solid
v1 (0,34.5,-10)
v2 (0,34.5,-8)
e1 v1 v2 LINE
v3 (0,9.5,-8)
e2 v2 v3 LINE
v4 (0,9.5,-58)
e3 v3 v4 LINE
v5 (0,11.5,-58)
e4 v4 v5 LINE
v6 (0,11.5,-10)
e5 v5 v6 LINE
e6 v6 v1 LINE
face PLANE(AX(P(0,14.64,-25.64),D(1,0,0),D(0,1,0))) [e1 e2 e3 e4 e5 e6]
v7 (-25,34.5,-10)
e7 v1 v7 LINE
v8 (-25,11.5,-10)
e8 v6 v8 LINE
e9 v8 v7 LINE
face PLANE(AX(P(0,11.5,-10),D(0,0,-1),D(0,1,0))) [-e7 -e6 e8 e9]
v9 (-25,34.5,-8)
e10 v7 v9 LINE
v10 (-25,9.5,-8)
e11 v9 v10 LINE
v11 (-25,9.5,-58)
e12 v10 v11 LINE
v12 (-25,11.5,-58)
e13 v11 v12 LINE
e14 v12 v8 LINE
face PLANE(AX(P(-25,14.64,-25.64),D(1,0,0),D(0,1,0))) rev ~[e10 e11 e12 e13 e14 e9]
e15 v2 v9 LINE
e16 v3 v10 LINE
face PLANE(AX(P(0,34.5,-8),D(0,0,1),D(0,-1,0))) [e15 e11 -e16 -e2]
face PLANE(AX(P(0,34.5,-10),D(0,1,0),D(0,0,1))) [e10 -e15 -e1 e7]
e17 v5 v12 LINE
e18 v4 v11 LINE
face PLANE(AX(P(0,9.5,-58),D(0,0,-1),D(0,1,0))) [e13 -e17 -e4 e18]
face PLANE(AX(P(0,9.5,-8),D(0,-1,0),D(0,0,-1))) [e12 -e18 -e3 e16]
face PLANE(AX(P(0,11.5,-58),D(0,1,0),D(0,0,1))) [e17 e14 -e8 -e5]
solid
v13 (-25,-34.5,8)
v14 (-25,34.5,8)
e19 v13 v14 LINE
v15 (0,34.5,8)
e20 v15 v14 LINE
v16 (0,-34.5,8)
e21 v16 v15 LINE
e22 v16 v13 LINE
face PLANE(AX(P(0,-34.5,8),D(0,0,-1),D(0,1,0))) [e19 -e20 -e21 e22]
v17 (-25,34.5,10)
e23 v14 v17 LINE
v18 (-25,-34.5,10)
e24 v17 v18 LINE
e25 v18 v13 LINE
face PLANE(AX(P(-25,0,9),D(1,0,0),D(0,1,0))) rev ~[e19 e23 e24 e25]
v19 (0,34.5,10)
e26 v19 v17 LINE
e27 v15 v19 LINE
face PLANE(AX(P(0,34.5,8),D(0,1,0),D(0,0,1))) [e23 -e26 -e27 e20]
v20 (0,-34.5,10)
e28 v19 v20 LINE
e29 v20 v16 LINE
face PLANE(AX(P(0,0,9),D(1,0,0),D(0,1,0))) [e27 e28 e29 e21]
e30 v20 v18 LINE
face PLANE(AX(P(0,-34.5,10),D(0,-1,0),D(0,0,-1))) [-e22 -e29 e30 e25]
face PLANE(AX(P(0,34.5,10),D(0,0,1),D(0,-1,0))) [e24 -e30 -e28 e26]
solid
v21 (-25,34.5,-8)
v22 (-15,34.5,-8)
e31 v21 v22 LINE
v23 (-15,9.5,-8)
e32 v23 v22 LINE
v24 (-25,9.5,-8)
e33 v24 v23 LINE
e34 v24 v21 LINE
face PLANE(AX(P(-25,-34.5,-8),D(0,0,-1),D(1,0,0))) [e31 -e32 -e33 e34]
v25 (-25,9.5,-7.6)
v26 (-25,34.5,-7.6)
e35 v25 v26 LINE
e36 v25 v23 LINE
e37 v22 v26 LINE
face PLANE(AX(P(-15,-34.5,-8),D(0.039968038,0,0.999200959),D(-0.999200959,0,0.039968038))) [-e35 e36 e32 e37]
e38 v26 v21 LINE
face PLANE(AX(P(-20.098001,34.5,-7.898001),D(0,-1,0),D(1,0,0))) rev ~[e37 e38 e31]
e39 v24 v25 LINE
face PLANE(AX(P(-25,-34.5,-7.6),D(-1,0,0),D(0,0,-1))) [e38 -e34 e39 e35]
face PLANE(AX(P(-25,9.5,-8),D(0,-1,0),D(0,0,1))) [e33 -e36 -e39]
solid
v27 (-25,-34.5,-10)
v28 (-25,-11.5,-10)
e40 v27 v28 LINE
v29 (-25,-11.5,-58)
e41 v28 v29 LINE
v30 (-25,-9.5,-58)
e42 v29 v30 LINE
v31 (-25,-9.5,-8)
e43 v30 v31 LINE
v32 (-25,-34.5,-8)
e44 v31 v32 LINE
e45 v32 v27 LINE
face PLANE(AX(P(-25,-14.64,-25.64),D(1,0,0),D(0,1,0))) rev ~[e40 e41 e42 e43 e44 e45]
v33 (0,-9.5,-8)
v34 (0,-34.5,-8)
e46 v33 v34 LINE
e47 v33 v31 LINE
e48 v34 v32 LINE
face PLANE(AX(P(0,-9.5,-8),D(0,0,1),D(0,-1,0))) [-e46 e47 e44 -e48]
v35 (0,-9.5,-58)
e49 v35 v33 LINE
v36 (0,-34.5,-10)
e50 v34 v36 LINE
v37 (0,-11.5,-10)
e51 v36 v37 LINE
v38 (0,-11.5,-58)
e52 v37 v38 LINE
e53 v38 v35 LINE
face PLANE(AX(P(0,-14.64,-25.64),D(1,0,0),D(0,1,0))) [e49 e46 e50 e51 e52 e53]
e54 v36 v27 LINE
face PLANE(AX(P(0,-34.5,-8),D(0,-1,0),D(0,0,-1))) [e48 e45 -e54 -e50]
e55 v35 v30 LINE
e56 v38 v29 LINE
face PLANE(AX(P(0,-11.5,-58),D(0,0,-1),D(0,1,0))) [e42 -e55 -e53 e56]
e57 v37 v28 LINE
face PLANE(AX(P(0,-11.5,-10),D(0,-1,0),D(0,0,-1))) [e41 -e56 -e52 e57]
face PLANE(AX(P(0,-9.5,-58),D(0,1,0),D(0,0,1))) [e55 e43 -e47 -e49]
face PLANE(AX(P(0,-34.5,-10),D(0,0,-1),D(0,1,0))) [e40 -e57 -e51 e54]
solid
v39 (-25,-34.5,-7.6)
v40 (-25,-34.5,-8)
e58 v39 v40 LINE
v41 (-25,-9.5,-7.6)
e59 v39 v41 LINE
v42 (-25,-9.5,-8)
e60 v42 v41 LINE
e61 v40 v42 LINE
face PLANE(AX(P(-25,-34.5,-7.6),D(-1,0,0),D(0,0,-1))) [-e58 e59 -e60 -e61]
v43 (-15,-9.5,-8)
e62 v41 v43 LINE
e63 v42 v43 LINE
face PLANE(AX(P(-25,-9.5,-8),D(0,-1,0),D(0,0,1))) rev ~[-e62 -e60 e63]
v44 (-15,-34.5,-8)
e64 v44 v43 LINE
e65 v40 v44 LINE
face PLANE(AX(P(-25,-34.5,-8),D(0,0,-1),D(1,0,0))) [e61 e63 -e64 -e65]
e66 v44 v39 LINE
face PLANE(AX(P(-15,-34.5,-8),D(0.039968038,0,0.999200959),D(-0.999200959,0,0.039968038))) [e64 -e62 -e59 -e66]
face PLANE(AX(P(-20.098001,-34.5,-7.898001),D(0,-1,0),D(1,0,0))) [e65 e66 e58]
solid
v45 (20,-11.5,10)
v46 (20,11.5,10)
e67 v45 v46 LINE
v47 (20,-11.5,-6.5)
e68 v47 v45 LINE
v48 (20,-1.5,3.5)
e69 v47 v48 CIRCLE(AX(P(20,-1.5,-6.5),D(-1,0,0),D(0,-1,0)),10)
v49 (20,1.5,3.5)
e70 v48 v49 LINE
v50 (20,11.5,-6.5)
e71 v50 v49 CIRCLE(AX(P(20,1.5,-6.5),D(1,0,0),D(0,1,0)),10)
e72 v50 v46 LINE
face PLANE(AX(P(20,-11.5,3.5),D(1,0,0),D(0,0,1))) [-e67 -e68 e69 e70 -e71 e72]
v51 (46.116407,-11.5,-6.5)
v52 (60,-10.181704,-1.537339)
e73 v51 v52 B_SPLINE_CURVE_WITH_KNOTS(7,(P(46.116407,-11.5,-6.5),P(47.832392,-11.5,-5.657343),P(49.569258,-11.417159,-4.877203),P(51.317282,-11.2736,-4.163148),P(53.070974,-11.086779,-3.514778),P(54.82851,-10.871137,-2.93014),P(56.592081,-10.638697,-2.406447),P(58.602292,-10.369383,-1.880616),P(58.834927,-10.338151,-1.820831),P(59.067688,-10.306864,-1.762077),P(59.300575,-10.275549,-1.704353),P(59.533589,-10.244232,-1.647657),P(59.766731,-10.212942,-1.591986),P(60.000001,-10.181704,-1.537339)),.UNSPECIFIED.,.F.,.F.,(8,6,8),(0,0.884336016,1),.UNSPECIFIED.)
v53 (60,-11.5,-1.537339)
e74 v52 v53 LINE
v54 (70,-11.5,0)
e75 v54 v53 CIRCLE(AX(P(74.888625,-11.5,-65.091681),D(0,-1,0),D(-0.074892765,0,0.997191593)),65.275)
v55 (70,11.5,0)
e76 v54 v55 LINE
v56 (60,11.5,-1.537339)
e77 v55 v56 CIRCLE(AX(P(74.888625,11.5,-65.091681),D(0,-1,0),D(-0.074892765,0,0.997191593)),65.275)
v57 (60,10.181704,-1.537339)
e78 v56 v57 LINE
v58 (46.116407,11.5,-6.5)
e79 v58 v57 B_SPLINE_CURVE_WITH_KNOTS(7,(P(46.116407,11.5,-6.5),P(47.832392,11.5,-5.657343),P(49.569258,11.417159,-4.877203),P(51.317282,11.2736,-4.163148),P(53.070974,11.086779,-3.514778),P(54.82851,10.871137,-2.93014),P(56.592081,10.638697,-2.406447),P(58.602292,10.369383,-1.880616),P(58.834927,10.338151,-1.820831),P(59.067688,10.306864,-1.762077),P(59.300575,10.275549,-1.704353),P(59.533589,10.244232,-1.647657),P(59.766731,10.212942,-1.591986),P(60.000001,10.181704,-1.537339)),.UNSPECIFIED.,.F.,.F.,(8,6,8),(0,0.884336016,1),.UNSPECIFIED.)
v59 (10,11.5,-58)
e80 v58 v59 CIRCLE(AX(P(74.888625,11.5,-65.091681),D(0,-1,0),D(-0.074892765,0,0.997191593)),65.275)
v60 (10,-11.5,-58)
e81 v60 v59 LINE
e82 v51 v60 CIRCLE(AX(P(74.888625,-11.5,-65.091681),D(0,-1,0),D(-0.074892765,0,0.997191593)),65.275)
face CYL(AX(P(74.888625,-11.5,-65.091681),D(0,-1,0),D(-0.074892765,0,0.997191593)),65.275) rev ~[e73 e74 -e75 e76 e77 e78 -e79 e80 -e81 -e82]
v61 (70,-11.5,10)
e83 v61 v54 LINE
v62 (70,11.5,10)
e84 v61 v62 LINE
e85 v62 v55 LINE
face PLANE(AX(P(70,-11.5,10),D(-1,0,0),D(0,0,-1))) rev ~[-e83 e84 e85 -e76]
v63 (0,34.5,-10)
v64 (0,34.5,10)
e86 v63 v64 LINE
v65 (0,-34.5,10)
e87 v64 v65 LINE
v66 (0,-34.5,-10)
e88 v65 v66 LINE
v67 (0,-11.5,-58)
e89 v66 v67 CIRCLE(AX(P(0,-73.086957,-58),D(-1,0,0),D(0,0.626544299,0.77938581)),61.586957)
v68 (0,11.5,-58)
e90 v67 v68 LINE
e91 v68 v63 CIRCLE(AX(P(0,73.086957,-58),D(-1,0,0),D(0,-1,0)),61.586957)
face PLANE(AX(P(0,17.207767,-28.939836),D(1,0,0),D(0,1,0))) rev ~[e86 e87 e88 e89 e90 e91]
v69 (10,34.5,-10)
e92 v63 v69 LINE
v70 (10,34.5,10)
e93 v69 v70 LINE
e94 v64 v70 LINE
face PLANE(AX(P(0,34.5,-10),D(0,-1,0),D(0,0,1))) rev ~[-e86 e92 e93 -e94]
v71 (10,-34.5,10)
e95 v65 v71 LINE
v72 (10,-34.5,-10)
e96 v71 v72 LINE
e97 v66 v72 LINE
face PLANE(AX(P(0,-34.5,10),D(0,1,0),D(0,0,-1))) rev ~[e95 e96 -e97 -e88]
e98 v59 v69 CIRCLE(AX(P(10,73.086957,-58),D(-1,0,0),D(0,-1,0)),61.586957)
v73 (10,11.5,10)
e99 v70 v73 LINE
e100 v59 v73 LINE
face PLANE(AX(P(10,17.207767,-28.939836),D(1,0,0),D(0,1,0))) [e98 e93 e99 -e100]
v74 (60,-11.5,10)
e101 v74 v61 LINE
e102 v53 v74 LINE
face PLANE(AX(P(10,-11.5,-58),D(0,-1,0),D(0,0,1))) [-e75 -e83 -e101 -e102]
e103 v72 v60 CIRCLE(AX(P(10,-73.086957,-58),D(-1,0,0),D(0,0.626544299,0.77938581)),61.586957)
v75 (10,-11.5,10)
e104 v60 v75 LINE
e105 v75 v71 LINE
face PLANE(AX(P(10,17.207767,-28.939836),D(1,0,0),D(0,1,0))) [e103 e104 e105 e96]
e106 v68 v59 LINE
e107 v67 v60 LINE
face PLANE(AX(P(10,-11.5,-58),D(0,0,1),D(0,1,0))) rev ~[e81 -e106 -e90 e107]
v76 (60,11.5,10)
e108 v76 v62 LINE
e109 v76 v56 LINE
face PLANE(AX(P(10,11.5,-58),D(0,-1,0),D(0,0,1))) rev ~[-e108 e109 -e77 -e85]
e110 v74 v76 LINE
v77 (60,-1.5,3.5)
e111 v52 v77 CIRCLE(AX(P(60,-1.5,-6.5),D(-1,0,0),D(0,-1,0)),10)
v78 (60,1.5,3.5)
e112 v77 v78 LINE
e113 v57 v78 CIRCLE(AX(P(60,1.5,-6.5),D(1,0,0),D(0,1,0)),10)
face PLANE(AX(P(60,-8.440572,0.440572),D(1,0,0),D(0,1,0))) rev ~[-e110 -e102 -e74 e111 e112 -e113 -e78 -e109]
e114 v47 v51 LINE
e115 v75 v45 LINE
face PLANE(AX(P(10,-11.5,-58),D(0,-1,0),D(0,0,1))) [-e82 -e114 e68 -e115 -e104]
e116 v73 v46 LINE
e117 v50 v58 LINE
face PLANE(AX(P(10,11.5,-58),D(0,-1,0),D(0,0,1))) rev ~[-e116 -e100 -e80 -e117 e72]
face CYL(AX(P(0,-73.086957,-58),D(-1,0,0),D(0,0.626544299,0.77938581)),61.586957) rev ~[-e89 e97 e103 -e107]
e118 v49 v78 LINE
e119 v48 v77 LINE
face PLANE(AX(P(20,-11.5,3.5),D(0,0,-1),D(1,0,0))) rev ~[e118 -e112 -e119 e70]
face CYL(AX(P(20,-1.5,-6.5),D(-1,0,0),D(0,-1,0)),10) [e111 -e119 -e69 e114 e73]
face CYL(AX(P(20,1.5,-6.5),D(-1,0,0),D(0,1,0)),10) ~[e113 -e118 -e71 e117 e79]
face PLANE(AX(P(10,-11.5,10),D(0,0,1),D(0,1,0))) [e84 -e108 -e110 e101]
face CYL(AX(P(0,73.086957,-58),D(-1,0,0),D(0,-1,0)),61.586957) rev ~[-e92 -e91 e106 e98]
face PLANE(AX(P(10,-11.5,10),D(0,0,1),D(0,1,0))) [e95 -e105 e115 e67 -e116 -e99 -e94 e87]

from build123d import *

# Parameters (mm, degrees)
F1_DEPTH     = 25
F2_DEPTH     = 10
F5_DEPTH     = 69
F6_W         = 19
F6_H         = 1.5
F7_DEPTH     = 10
F8_W         = 23
F8_H         = 68
F9_DEPTH     = 100
F10_W        = 40
F10_H        = 6.5
F11_DEPTH    = 46.001
F12_DEPTH    = 23.001
F13_T1_DEPTH = 40


# Not quite as in the source:
# - a fillet or chamfer that OpenCascade refuses, or shapes differently, is made with other operations: its cross-section is extruded or revolved along the edge and cut away or added
# - a feature names something its author has since deleted; it is built from what else it names


with BuildPart() as f1:
    # F0 (on Right) → F1 (new body)
    with BuildSketch(Plane.YZ):
        Polygon((-9.5, -8), (-34.5, -8), (-34.5, -10), (-11.5, -10), (-11.5, -58), (-9.5, -58), align=None)
    extrude(amount=-F1_DEPTH)

    # F10 (on face) → F12 (cut, through all)
    with BuildSketch(Plane.XZ.offset(11.5)):
        with Locations((40, 6.75)):
            Rectangle(F10_W, F10_H)
        with BuildLine():
            Line((110, 10), (70, 10))
            Line((70, 10), (70, 0))
            ThreePointArc((70, 0), (29.5210578409, -18.1597150078), (10, -58))
            Line((10, -58), (110, -58))
            Line((110, -58), (110, 10))
        make_face()
    extrude(amount=F12_DEPTH, mode=Mode.SUBTRACT)


with BuildPart() as f1b:
    # F0 (on Right) → F1, piece 2 (new body)
    with BuildSketch(Plane.YZ):
        Polygon((34.5, -10), (34.5, -8), (9.5, -8), (9.5, -58), (11.5, -58), (11.5, -10), align=None)
    extrude(amount=-F1_DEPTH)


with BuildPart() as f1c:
    # F0 (on Right) → F1, piece 3 (new body)
    with BuildSketch(Plane.YZ):
        Polygon((-9.5, 8), (9.5, 8), (34.5, 8), (34.5, 10), (9.5, 10), (-9.5, 10), (-34.5, 10), (-34.5, 8), align=None)
    extrude(amount=-F1_DEPTH)


with BuildPart() as f2:
    # F0 (on Right) → F2 (new body)
    with BuildSketch(Plane.YZ):
        with BuildLine():
            ThreePointArc((11.5, -58), (17.5468519701, -31.3870332357), (34.5, -10))
            Line((34.5, -10), (11.5, -10))
            Line((11.5, -10), (11.5, -58))
        make_face()
        Polygon((34.5, 8), (9.5, 8), (-9.5, 8), (-34.5, 8), (-34.5, -8), (-9.5, -8), (-9.5, -58), (9.5, -58), (9.5, -8), (34.5, -8), align=None)
        with BuildLine():
            Line((-11.5, -10), (-34.5, -10))
            ThreePointArc((-34.5, -10), (-17.5468519701, -31.3870332357), (-11.5, -58))
            Line((-11.5, -58), (-11.5, -10))
        make_face()
        Polygon((-9.5, -8), (-34.5, -8), (-34.5, -10), (-11.5, -10), (-11.5, -58), (-9.5, -58), align=None)
        Polygon((34.5, -10), (34.5, -8), (9.5, -8), (9.5, -58), (11.5, -58), (11.5, -10), align=None)
        Polygon((-9.5, 8), (9.5, 8), (34.5, 8), (34.5, 10), (9.5, 10), (-9.5, 10), (-34.5, 10), (-34.5, 8), align=None)
    extrude(amount=F2_DEPTH)

    # F8 (on face) → F9 (join)
    with BuildSketch(Plane.YZ.offset(10)):
        with Locations((0, -24)):
            Rectangle(F8_W, F8_H)
    extrude(amount=F9_DEPTH)

    # F10 (on face) → F11 (cut, through all)
    with BuildSketch(Plane.XZ.offset(11.5)):
        with Locations((40, 6.75)):
            Rectangle(F10_W, F10_H)
        with BuildLine():
            Line((110, 10), (70, 10))
            Line((70, 10), (70, 0))
            ThreePointArc((70, 0), (29.5210578409, -18.1597150078), (10, -58))
            Line((10, -58), (110, -58))
            Line((110, -58), (110, 10))
        make_face()
    extrude(amount=-F11_DEPTH, mode=Mode.SUBTRACT)

    # F13: fillet of radius 10 on 2 edges, made by hand

    # F13_s2 → F13_t1 (cut)
    with BuildSketch(Plane.YZ.offset(20)):
        with BuildLine():
            ThreePointArc((11.5, -6.5), (8.5710678119, 0.5710678119), (1.5, 3.5))
            Line((1.5, 3.5), (11.5, 3.5))
            Line((11.5, 3.5), (11.5, -6.5))
        make_face()
        with BuildLine():
            ThreePointArc((-11.5, -6.5), (-8.5710678119, 0.5710678119), (-1.5, 3.5))
            Line((-1.5, 3.5), (-11.5, 3.5))
            Line((-11.5, 3.5), (-11.5, -6.5))
        make_face()
    extrude(amount=F13_T1_DEPTH, mode=Mode.SUBTRACT)


with BuildPart() as f5:
    # F4 (on face) → F5 (new body)
    with BuildSketch(Plane.XZ.offset(34.5)):
        Polygon((-25, -7.6), (-25, -8), (-15, -8), align=None)
    extrude(amount=-F5_DEPTH)

    # F6 (on face) → F7 (cut)
    with BuildSketch(Plane(origin=(-25, 0, 0), x_dir=(0, -1, 0), z_dir=(-1, 0, 0))):
        with Locations((0, -7.25)):
            Rectangle(F6_W, F6_H)
    extrude(amount=-F7_DEPTH, mode=Mode.SUBTRACT)


solid = Compound([f1.part, f1b.part, f1c.part, f2.part, f5.part])
